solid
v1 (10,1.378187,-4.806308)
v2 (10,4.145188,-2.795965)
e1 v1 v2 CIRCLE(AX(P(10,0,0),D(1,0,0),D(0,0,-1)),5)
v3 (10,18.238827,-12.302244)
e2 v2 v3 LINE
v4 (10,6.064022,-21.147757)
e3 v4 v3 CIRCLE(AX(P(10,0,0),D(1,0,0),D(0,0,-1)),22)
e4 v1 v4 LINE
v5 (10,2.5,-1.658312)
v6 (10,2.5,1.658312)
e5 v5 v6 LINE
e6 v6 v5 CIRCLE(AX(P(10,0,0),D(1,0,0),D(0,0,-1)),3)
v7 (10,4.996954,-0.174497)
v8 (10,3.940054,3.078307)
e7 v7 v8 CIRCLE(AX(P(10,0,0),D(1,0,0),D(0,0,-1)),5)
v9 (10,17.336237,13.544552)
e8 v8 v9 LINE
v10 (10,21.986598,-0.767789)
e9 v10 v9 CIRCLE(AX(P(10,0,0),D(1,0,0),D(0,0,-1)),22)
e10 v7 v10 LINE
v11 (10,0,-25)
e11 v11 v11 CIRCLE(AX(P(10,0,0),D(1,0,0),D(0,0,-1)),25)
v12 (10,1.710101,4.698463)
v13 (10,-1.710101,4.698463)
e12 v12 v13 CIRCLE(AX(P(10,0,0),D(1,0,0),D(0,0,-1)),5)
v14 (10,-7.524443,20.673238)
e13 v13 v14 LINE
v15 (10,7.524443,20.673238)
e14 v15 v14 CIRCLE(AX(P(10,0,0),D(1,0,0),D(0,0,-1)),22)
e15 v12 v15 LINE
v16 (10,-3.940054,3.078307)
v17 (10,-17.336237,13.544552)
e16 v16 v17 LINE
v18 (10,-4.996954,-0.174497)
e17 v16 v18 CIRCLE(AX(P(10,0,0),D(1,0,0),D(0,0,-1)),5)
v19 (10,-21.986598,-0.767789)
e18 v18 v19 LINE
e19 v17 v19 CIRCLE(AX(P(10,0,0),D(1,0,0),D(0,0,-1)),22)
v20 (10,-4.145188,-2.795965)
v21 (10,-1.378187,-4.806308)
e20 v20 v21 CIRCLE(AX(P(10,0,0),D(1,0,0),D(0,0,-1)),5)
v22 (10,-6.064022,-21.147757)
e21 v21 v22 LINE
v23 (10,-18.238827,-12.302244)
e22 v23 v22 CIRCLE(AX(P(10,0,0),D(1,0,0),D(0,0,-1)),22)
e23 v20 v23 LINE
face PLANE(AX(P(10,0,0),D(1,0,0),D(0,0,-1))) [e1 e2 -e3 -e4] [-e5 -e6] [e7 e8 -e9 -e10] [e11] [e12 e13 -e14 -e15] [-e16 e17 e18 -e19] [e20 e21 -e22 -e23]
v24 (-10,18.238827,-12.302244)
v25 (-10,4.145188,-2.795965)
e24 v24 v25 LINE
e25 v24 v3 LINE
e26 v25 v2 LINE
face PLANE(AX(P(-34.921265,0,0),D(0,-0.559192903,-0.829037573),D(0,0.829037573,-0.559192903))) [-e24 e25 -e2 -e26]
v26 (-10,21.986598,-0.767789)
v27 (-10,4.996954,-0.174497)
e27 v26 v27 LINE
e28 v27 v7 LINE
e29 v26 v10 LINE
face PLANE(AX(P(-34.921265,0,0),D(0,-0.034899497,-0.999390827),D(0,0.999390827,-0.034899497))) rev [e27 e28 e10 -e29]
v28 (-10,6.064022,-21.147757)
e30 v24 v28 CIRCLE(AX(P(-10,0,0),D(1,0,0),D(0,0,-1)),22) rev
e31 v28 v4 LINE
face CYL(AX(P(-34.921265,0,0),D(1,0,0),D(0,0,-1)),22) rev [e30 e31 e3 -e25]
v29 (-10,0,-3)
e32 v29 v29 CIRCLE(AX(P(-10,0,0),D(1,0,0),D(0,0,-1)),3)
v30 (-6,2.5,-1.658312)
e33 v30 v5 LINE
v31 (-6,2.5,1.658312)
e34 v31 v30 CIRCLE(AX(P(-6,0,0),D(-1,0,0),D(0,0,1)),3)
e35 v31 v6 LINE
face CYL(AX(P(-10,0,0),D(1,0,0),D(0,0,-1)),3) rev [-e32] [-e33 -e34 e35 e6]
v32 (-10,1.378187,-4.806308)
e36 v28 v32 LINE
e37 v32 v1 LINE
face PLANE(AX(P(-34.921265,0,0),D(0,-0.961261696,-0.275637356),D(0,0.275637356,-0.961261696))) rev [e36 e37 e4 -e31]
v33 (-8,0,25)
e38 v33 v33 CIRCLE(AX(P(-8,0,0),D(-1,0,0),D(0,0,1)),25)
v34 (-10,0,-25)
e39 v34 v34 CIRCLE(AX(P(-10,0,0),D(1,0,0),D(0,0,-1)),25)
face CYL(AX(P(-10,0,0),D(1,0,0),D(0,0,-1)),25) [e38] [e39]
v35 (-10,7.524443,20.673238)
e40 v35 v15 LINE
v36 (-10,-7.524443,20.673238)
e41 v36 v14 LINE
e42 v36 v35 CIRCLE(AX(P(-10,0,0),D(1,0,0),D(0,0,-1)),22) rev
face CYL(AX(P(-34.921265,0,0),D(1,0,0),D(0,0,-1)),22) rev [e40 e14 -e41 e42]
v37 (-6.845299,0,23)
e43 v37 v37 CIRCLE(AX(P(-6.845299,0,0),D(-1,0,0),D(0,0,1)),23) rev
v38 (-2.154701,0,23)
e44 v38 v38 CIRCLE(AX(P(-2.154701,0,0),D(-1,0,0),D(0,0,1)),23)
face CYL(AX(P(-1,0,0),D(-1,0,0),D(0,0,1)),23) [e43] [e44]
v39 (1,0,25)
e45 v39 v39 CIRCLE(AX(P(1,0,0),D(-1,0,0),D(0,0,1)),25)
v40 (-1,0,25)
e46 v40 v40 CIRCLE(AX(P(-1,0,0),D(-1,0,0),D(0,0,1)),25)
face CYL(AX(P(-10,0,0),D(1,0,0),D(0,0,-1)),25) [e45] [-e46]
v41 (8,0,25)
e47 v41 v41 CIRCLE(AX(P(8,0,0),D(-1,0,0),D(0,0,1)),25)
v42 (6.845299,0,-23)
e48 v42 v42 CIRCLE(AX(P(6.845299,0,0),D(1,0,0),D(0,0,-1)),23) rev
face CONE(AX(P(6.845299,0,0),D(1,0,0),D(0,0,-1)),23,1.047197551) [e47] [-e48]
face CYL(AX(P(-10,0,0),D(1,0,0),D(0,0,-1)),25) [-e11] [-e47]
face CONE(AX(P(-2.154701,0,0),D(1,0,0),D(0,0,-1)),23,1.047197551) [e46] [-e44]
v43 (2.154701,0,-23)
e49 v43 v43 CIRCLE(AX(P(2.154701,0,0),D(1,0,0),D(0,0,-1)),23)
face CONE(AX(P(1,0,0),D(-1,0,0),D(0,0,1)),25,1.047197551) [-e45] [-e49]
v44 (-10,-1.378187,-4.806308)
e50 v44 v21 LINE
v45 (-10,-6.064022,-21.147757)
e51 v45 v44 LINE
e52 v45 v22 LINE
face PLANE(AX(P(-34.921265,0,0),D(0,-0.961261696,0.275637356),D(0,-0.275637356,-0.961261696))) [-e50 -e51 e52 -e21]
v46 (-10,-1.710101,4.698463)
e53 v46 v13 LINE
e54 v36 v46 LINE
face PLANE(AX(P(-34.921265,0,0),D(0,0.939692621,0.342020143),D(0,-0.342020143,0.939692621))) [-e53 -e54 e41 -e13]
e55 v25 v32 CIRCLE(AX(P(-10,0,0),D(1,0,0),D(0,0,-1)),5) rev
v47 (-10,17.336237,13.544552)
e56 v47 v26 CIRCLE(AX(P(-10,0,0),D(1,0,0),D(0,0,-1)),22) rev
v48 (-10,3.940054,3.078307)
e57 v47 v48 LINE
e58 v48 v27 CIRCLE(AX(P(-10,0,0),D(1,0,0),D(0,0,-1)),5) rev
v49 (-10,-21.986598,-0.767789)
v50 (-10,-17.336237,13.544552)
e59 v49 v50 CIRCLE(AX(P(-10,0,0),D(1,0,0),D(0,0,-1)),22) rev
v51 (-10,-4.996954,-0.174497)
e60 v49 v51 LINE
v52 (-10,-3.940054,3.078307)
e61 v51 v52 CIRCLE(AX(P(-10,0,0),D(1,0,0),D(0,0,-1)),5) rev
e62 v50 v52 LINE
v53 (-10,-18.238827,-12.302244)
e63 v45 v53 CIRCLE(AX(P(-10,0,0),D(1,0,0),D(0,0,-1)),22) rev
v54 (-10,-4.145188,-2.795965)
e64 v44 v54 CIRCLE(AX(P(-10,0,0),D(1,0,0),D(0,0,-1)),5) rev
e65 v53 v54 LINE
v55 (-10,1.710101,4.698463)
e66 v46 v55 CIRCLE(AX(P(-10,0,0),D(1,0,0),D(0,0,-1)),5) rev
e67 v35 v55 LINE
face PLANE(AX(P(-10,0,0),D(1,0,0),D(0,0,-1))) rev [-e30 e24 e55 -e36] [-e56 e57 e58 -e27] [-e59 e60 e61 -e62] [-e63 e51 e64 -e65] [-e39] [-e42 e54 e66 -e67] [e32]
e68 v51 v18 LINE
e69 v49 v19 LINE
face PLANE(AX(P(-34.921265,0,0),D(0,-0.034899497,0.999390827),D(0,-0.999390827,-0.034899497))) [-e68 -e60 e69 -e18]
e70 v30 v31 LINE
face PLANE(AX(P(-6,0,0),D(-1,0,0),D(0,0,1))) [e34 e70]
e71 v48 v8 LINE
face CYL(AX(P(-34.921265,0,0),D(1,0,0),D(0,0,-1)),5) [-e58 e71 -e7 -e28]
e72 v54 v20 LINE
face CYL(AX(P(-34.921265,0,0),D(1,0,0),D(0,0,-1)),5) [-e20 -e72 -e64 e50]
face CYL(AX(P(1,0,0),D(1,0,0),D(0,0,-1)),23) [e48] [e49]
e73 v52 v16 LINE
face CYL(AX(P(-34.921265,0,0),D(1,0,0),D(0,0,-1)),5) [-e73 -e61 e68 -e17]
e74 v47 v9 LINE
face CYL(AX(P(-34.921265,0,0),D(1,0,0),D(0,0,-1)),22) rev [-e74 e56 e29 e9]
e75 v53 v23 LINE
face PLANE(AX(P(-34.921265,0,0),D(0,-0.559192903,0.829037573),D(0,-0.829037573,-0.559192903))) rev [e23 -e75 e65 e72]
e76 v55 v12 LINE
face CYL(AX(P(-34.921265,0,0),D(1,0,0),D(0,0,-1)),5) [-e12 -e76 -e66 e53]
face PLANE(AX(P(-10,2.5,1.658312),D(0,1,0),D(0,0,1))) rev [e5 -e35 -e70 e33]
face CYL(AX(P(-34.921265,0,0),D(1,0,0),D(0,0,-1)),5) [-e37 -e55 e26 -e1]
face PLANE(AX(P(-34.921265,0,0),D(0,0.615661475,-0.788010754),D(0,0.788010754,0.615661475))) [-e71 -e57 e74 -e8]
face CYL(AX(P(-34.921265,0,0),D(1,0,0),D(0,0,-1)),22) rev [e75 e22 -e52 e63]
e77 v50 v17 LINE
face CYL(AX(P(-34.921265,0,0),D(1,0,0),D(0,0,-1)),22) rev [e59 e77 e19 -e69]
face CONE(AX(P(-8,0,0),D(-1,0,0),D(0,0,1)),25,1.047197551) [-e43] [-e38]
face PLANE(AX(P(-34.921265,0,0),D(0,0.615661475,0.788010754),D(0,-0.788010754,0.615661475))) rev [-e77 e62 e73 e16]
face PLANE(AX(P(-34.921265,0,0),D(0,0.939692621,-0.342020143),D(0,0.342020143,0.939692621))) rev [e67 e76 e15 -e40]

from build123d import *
from OCP.BRepFilletAPI import BRepFilletAPI_MakeChamfer

# Parameters (mm, degrees)
BASE_DEPTH          = 10
BASE_DEPTH_BACK     = 10
ESQUISSE1_R         = 25
ESQUISSE2_R         = 25
ESQUISSE2_R_2       = 23
VIDE_GORGE_DEPTH    = 7
VIDE_JANTE_DEPTH    = 20
ESQUISSE6_R         = 3
VIDE_BLOC_AXE_DEPTH = 4
CHAN_EXT_SIZE       = 2
CHAN_EXT_SIZE_2     = 1.154700538
CHAN_INT_SIZE       = 1.154700538
CHAN_INT_SIZE_2     = 2


with BuildPart() as part:
    # Esquisse1 → BASE (new, two sides: drawn at the far end of the back side and taken through both)
    with BuildSketch(Plane(origin=(0, 0, 0), x_dir=(0, 0, -1), z_dir=(1, 0, 0)).offset(-BASE_DEPTH_BACK)):
        Circle(ESQUISSE1_R)
        with BuildLine():
            Line((-1.658312395, 2.5), (1.658312395, 2.5))
            ThreePointArc((1.658312395, 2.5), (0, -3), (-1.658312395, 2.5))
        make_face(mode=Mode.SUBTRACT)
    extrude(amount=BASE_DEPTH + BASE_DEPTH_BACK)

    # Esquisse2 → VIDE GORGE (cut)
    with BuildSketch(Plane.ZY.offset(8)):
        with Locations(Location((0, 0, 0), (0, 0, 180))):
            Circle(ESQUISSE2_R)
        Circle(ESQUISSE2_R_2, mode=Mode.SUBTRACT)
    vide_gorge = extrude(amount=-VIDE_GORGE_DEPTH, mode=Mode.SUBTRACT)

    # SYM GORGE: VIDE GORGE across plane
    add(vide_gorge.mirror(Plane(origin=(0, 0, 0), x_dir=(0, 0, 1), z_dir=(1, 0, 0))), mode=Mode.SUBTRACT)

    # Esquisse4 → VIDE JANTE (cut)
    with BuildSketch(Plane(origin=(10, 0, 0), x_dir=(0, 0, -1), z_dir=(1, 0, 0))):
        with BuildLine():
            Line((-22, 0), (-5, 0))
            ThreePointArc((-5, 0), (-4.924038765, 0.868240888), (-4.698463104, 1.710100717))
            Line((-4.698463104, 1.710100717), (-20.673237657, 7.524443153))
            ThreePointArc((-20.673237657, 7.524443153), (-21.665770566, 3.820259909), (-22, 0))
        make_face()
        with BuildLine():
            ThreePointArc((-4.698463104, -1.710100717), (-4.924038765, -0.868240888), (-5, 0))
            Line((-5, 0), (-22, 0))
            ThreePointArc((-22, 0), (-21.665770566, -3.820259909), (-20.673237657, -7.524443153))
            Line((-20.673237657, -7.524443153), (-4.698463104, -1.710100717))
        make_face()
        with BuildLine():
            Line((-13.544552457, 17.336236579), (-3.078307377, 3.940053768))
            ThreePointArc((-3.078307377, 3.940053768), (-1.545084972, 4.755282581), (0.174497484, 4.996954135))
            Line((0.174497484, 4.996954135), (0.767788927, 21.986598194))
            ThreePointArc((0.767788927, 21.986598194), (-6.798373876, 20.923243358), (-13.544552457, 17.336236579))
        make_face()
        with BuildLine():
            Line((12.302243876, 18.238826596), (2.795964517, 4.145187863))
            ThreePointArc((2.795964517, 4.145187863), (4.045084972, 2.938926261), (4.80630848, 1.378186779))
            Line((4.80630848, 1.378186779), (21.147757311, 6.064021828))
            ThreePointArc((21.147757311, 6.064021828), (17.798373876, 12.93127555), (12.302243876, 18.238826596))
        make_face()
        with BuildLine():
            ThreePointArc((4.80630848, -1.378186779), (4.045084972, -2.938926261), (2.795964517, -4.145187863))
            Line((2.795964517, -4.145187863), (12.302243876, -18.238826596))
            ThreePointArc((12.302243876, -18.238826596), (17.798373876, -12.93127555), (21.147757311, -6.064021828))
            Line((21.147757311, -6.064021828), (4.80630848, -1.378186779))
        make_face()
        with BuildLine():
            ThreePointArc((0.174497484, -4.996954135), (-1.545084972, -4.755282581), (-3.078307377, -3.940053768))
            Line((-3.078307377, -3.940053768), (-13.544552457, -17.336236579))
            ThreePointArc((-13.544552457, -17.336236579), (-6.798373876, -20.923243358), (0.767788927, -21.986598194))
            Line((0.767788927, -21.986598194), (0.174497484, -4.996954135))
        make_face()
    extrude(amount=-VIDE_JANTE_DEPTH, mode=Mode.SUBTRACT)

    # Esquisse6 → VIDE BLOC AXE (cut)
    with BuildSketch(Plane.ZY.offset(10)):
        with Locations(Location((0, 0, 0), (0, 0, 180))):
            Circle(ESQUISSE6_R)
    extrude(amount=-VIDE_BLOC_AXE_DEPTH, mode=Mode.SUBTRACT)

    # CHAN EXT
    chan_ext_edges_1 = [part.edges().sort_by_distance(p)[0] for p in [
        (-8, 0, -23),
    ]]
    chan_ext_side_1 = [part.faces().sort_by_distance(p)[0] for p in [
        (-8, 0, -23.023094011),
    ]]
    chan_ext_edges_2 = [part.edges().sort_by_distance(p)[0] for p in [
        (8, 0, -23),
    ]]
    chan_ext_side_2 = [part.faces().sort_by_distance(p)[0] for p in [
        (7.976905989, 0, -23),
    ]]
    chan_ext = BRepFilletAPI_MakeChamfer(part.part.solid().wrapped)
    for e in chan_ext_edges_1:
        chan_ext.Add(CHAN_EXT_SIZE - 0.0001, CHAN_EXT_SIZE_2 - 0.0001, e.wrapped, chan_ext_side_1[0].wrapped)
    for e in chan_ext_edges_2:
        chan_ext.Add(CHAN_EXT_SIZE_2 - 0.0001, CHAN_EXT_SIZE - 0.0001, e.wrapped, chan_ext_side_2[0].wrapped)
    add(Compound.cast(chan_ext.Shape()), mode=Mode.REPLACE)  # a hair under: the kernel refuses the full size

    # CHAN INT
    chan_int_edges_1 = [part.edges().sort_by_distance(p)[0] for p in [
        (-1, 0, -23),
    ]]
    chan_int_side_1 = [part.faces().sort_by_distance(p)[0] for p in [
        (-1.023094011, 0, -23),
    ]]
    chan_int_edges_2 = [part.edges().sort_by_distance(p)[0] for p in [
        (1, 0, -23),
    ]]
    chan_int_side_2 = [part.faces().sort_by_distance(p)[0] for p in [
        (1, 0, -23.023094011),
    ]]
    chan_int = BRepFilletAPI_MakeChamfer(part.part.solid().wrapped)
    for e in chan_int_edges_1:
        chan_int.Add(CHAN_INT_SIZE - 0.0001, CHAN_INT_SIZE_2 - 0.0001, e.wrapped, chan_int_side_1[0].wrapped)
    for e in chan_int_edges_2:
        chan_int.Add(CHAN_INT_SIZE_2 - 0.0001, CHAN_INT_SIZE - 0.0001, e.wrapped, chan_int_side_2[0].wrapped)
    add(Compound.cast(chan_int.Shape()), mode=Mode.REPLACE)  # a hair under: the kernel refuses the full size


solid = part.part
